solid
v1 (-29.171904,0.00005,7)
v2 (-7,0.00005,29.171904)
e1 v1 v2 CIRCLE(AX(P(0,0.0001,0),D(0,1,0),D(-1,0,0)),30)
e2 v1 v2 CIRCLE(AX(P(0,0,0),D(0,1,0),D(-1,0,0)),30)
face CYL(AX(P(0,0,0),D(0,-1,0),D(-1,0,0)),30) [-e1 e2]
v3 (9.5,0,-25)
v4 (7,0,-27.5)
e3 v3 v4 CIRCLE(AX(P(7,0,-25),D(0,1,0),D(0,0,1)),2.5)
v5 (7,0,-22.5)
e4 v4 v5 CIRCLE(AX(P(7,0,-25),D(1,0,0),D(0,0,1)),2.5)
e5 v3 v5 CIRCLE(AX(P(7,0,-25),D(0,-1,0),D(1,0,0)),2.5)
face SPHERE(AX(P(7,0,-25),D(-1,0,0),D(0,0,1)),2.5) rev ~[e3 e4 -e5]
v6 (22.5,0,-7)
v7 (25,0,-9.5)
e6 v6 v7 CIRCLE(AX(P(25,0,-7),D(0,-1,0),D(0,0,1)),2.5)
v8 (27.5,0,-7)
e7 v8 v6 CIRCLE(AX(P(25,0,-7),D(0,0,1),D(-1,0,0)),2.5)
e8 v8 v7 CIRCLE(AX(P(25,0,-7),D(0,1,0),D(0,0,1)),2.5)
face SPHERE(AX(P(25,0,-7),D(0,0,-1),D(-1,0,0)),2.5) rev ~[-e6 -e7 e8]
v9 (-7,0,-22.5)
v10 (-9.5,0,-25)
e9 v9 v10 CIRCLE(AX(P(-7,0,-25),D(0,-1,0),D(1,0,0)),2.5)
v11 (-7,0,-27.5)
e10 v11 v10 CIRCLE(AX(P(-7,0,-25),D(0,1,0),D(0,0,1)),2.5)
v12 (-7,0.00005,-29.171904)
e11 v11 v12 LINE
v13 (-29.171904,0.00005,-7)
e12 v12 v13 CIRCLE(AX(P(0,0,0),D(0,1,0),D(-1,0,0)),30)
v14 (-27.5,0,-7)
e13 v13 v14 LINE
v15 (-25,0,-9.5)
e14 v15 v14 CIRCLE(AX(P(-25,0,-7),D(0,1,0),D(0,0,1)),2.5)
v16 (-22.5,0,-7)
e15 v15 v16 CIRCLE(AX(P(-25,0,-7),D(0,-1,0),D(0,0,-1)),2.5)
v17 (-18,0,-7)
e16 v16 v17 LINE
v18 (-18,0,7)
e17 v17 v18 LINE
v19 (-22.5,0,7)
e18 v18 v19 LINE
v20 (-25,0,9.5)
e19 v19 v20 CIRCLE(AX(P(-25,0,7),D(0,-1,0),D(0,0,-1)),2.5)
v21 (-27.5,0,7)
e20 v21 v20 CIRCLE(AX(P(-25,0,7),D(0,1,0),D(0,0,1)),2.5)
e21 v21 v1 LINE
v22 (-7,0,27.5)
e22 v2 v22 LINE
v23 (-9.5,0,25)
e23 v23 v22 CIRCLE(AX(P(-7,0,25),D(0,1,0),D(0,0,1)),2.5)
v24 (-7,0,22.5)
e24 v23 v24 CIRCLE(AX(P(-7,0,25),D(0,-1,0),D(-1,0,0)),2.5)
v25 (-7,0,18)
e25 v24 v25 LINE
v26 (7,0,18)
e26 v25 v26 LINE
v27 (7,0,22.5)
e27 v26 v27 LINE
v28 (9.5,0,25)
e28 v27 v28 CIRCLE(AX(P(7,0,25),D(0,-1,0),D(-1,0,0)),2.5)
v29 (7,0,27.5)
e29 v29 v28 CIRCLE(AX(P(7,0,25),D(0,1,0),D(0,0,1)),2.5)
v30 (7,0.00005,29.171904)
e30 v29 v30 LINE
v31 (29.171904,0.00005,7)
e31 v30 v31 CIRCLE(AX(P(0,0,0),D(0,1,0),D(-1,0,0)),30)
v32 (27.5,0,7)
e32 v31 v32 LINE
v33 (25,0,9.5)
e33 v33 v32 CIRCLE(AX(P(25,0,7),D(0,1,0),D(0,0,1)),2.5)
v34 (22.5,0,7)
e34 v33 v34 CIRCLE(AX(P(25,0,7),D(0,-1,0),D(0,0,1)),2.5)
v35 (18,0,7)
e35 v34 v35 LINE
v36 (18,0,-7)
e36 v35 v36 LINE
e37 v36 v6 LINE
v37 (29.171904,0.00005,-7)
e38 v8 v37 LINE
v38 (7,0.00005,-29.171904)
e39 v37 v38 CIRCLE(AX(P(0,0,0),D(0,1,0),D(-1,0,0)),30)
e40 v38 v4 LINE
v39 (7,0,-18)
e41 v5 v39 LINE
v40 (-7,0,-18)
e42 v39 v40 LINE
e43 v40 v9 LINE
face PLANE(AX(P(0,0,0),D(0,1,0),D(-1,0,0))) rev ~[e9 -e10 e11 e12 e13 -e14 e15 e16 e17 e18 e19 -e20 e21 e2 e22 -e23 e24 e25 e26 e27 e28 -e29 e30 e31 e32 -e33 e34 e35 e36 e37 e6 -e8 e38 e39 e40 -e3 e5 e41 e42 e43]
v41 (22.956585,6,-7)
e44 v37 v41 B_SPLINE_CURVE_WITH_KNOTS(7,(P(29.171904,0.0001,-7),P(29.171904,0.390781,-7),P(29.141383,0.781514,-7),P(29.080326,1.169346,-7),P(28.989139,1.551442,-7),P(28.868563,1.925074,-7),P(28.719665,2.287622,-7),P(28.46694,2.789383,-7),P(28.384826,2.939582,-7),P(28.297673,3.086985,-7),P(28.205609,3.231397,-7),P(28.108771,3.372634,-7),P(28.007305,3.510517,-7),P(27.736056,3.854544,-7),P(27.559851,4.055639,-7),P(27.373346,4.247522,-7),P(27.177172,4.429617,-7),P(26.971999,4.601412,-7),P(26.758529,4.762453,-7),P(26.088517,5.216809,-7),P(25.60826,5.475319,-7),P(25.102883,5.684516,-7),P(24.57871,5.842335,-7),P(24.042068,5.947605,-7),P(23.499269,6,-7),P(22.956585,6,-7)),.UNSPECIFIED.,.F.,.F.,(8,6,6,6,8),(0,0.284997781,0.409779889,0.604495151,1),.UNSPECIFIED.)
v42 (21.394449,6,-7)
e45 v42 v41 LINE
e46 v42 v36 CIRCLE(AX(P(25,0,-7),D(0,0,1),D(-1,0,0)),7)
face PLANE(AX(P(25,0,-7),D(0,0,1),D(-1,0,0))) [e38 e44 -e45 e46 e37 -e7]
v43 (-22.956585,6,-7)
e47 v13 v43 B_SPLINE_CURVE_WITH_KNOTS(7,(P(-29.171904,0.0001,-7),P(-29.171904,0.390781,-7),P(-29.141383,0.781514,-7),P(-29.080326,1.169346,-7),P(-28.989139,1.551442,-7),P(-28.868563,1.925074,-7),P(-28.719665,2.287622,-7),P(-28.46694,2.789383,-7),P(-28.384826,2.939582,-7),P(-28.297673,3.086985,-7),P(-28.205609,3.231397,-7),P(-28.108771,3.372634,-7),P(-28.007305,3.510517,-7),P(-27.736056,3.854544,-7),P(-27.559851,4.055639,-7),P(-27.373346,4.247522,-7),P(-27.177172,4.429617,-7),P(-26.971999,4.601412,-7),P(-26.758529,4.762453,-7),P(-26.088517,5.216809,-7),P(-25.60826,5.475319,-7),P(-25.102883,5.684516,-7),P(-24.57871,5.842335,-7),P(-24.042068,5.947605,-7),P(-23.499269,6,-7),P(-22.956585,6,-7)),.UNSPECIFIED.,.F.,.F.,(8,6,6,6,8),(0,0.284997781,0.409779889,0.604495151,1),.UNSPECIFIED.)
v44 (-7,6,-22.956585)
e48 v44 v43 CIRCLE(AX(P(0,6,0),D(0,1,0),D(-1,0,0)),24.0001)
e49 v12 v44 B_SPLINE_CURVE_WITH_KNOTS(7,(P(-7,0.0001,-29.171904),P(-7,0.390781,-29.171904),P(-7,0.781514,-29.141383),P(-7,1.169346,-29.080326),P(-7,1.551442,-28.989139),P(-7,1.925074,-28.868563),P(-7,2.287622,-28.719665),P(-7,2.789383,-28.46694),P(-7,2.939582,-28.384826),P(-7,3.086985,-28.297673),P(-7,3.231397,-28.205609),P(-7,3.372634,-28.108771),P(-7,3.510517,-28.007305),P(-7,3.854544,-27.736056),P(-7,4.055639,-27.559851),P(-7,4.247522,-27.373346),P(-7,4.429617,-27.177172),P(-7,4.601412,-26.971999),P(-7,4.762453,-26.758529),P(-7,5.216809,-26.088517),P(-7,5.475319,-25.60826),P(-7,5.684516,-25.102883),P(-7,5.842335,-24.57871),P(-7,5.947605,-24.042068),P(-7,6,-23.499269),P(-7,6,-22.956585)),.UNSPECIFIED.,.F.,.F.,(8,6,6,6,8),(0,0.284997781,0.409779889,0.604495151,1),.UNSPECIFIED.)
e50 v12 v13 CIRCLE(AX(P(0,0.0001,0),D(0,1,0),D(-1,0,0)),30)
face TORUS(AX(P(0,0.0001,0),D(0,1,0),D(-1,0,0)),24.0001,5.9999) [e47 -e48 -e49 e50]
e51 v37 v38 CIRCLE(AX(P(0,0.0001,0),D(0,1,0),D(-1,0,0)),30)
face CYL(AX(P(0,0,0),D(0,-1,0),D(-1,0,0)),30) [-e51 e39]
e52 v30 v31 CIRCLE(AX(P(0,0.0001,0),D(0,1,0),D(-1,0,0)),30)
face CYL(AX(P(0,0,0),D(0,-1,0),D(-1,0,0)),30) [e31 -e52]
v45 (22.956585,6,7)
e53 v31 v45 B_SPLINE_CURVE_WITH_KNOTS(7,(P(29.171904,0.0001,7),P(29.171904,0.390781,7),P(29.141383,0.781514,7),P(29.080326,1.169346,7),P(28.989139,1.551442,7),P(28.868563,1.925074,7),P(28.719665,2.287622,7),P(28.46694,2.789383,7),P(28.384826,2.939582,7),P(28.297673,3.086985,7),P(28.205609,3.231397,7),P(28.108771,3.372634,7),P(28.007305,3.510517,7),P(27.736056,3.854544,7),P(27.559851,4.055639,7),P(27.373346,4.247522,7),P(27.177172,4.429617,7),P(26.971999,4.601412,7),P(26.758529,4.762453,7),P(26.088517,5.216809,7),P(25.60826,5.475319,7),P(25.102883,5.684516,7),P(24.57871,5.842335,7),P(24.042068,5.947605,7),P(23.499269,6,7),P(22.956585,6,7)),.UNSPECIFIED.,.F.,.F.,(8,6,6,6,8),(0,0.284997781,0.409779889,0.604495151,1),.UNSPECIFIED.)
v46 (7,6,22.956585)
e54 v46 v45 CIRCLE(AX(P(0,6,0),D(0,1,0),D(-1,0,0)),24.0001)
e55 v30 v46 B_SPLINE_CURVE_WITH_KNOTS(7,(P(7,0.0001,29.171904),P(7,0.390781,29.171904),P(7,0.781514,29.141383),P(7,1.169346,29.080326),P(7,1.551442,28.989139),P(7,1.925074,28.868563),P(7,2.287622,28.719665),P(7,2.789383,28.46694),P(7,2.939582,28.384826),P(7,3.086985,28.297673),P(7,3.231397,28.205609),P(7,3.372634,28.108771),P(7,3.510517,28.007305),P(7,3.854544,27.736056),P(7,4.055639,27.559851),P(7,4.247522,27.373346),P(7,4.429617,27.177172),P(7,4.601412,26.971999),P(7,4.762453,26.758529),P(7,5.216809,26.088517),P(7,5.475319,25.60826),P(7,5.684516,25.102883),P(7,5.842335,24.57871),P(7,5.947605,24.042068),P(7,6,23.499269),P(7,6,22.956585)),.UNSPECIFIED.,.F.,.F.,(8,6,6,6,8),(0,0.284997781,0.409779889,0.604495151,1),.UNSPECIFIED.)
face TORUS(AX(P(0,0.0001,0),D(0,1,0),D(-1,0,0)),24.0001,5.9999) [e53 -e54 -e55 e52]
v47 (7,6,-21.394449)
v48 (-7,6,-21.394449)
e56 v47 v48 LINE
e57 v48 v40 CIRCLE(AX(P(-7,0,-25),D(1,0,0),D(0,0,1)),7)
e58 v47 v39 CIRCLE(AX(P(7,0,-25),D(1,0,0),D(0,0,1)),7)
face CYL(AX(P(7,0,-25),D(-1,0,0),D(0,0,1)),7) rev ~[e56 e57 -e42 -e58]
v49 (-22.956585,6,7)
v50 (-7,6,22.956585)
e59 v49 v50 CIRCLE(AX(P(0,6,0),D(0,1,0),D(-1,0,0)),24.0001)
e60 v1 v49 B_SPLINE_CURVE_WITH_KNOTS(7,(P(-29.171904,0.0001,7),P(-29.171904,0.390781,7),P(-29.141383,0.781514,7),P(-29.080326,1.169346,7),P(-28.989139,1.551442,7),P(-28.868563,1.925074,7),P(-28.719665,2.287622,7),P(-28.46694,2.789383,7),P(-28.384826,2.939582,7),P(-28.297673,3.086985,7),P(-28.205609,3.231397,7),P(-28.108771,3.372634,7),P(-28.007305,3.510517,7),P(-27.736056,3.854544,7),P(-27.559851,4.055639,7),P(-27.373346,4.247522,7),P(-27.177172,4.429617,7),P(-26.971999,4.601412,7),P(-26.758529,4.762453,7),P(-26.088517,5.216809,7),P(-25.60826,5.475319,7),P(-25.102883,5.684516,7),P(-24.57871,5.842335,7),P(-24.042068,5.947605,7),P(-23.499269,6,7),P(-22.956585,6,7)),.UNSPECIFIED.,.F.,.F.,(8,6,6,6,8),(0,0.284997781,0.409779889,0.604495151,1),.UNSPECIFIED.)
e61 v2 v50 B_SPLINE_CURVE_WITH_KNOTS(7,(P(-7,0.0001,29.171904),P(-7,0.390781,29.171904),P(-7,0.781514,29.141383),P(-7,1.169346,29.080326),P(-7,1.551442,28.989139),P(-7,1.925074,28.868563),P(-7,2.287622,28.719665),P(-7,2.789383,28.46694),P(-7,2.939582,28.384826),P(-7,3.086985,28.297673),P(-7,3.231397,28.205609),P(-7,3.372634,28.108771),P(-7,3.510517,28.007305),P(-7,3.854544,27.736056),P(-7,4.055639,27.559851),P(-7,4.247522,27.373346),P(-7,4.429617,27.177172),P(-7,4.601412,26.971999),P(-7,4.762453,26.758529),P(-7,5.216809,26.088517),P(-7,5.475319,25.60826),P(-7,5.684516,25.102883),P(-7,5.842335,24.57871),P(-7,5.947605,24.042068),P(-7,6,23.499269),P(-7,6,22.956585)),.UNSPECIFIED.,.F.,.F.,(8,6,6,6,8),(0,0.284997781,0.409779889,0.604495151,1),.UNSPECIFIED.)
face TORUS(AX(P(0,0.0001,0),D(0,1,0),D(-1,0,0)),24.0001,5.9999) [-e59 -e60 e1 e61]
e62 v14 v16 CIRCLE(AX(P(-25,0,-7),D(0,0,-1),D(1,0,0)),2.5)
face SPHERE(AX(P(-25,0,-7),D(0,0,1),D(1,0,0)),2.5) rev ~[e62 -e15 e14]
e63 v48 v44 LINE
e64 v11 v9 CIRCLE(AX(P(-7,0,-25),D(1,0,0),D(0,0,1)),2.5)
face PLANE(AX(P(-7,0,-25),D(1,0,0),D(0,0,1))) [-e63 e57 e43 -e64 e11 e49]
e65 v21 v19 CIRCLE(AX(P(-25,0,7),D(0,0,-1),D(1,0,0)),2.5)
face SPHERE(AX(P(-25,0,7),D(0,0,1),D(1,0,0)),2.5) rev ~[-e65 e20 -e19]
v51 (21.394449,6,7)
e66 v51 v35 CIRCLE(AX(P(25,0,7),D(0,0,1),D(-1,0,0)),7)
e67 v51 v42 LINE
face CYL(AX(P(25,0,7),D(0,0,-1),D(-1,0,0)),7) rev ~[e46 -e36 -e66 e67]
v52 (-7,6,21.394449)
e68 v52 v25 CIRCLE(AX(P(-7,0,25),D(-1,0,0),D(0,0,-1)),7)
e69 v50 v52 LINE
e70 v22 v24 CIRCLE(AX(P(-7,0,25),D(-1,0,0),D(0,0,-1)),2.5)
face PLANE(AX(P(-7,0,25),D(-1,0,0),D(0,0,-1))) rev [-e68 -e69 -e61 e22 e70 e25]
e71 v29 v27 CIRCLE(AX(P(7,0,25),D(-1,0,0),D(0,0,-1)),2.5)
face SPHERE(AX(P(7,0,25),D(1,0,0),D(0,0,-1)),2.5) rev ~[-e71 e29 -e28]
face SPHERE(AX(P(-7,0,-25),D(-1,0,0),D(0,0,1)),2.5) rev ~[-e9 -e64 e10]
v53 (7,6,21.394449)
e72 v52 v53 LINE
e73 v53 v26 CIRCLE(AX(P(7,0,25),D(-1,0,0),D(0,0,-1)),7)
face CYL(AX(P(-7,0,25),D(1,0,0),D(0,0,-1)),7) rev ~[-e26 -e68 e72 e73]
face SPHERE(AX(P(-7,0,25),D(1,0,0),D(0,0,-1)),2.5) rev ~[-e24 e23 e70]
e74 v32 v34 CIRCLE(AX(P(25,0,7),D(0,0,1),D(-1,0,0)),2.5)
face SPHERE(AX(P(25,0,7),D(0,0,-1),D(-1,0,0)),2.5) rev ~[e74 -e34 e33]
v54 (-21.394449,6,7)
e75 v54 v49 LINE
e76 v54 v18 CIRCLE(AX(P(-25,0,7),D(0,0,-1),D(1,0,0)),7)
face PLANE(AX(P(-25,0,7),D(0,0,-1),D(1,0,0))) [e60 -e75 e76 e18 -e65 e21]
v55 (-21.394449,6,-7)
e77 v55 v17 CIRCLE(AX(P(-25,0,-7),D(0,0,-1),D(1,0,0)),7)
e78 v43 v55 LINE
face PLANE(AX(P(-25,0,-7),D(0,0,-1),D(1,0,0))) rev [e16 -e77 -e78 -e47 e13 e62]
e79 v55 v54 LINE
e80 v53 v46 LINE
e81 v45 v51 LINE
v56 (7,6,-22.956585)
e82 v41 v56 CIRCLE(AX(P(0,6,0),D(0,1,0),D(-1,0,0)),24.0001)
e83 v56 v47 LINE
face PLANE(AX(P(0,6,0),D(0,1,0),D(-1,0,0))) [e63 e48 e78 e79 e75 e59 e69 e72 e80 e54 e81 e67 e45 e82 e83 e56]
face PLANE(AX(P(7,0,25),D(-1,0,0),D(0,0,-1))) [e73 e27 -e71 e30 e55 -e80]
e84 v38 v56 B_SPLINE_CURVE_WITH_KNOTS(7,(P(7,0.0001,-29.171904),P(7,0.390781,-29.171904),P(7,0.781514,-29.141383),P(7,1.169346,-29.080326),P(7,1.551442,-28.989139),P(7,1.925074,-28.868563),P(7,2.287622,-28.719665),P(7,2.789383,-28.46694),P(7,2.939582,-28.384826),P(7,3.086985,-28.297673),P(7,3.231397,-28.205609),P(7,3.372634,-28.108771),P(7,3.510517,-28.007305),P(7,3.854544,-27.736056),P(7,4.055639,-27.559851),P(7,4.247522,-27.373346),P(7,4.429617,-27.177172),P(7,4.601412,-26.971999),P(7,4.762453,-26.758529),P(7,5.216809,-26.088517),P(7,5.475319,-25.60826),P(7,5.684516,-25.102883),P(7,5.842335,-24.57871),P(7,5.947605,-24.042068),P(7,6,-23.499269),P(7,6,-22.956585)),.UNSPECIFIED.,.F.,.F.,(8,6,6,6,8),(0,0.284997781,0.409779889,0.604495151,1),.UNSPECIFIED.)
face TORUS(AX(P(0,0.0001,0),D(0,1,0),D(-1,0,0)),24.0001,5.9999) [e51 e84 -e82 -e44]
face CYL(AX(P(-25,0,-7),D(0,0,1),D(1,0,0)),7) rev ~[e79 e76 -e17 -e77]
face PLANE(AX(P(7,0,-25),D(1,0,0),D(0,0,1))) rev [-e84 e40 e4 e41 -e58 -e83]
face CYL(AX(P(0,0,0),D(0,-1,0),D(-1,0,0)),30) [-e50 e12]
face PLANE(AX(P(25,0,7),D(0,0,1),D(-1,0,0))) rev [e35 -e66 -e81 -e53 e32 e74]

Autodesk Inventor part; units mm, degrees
ref_plane "YZ Plane" through (0, 0, 0) normal (1, 0, 0) x (0, 1, 0)
ref_plane "XZ Plane" through (0, 0, 0) normal (0, 1, 0) x (-1, 0, 0)
ref_plane "XY Plane" through (0, 0, 0) normal (0, 0, 1) x (1, 0, 0)
sketch "Sketch1" plane through (0, 0, 0) normal (0, 1, 0) x (-1, 0, 0)
  circle A0 centre (0, 0) radius 30
  dimension "d0" = 60
extrude "Extrusion1" add sketch "Sketch1" along normal blind 6
fillet "Fillet1" radius 6 1 edges at (30, 6, 0)
sketch "Sketch2" plane through (0, 0, 0) normal (0, -1, 0) x (1, 0, 0)
  line L0 (-7, -25) -> (7, -25)
  line L1 (7, -25) -> (7, -18)
  line L2 (7, -18) -> (-7, -18)
  line L3 (-7, -18) -> (-7, -25)
  line L4 (-7, -25) -> (7, -18) construction
  line L5 (7, -25) -> (-7, -18) construction
  arc A0 (-4.5, -25) -> (-9.5, -25) centre (-7, -25) ccw
  arc A1 (9.5, -25) -> (4.5, -25) centre (7, -25) ccw
  line L6 (-9.5, -25) -> (9.5, -25)
  point P0 (0, 0)
  point P1 (0, -21.5)
  dimension "d4" = 14
  dimension "d5" = 7
  dimension "d6" = 18
  dimension "d7" = 5
  dimension "d8" = 5
revolve "Revolution1" cut sketch "Sketch2" angle 360 about axis through (-7, 0, -25) along (1, 0, 0)
pattern_circular "Circular Pattern1" count 4 over 360 about axis through (0, -10, 0) along (0, 1, 0) of "Revolution1"
properties part number "omni_wheel_cover_template"
